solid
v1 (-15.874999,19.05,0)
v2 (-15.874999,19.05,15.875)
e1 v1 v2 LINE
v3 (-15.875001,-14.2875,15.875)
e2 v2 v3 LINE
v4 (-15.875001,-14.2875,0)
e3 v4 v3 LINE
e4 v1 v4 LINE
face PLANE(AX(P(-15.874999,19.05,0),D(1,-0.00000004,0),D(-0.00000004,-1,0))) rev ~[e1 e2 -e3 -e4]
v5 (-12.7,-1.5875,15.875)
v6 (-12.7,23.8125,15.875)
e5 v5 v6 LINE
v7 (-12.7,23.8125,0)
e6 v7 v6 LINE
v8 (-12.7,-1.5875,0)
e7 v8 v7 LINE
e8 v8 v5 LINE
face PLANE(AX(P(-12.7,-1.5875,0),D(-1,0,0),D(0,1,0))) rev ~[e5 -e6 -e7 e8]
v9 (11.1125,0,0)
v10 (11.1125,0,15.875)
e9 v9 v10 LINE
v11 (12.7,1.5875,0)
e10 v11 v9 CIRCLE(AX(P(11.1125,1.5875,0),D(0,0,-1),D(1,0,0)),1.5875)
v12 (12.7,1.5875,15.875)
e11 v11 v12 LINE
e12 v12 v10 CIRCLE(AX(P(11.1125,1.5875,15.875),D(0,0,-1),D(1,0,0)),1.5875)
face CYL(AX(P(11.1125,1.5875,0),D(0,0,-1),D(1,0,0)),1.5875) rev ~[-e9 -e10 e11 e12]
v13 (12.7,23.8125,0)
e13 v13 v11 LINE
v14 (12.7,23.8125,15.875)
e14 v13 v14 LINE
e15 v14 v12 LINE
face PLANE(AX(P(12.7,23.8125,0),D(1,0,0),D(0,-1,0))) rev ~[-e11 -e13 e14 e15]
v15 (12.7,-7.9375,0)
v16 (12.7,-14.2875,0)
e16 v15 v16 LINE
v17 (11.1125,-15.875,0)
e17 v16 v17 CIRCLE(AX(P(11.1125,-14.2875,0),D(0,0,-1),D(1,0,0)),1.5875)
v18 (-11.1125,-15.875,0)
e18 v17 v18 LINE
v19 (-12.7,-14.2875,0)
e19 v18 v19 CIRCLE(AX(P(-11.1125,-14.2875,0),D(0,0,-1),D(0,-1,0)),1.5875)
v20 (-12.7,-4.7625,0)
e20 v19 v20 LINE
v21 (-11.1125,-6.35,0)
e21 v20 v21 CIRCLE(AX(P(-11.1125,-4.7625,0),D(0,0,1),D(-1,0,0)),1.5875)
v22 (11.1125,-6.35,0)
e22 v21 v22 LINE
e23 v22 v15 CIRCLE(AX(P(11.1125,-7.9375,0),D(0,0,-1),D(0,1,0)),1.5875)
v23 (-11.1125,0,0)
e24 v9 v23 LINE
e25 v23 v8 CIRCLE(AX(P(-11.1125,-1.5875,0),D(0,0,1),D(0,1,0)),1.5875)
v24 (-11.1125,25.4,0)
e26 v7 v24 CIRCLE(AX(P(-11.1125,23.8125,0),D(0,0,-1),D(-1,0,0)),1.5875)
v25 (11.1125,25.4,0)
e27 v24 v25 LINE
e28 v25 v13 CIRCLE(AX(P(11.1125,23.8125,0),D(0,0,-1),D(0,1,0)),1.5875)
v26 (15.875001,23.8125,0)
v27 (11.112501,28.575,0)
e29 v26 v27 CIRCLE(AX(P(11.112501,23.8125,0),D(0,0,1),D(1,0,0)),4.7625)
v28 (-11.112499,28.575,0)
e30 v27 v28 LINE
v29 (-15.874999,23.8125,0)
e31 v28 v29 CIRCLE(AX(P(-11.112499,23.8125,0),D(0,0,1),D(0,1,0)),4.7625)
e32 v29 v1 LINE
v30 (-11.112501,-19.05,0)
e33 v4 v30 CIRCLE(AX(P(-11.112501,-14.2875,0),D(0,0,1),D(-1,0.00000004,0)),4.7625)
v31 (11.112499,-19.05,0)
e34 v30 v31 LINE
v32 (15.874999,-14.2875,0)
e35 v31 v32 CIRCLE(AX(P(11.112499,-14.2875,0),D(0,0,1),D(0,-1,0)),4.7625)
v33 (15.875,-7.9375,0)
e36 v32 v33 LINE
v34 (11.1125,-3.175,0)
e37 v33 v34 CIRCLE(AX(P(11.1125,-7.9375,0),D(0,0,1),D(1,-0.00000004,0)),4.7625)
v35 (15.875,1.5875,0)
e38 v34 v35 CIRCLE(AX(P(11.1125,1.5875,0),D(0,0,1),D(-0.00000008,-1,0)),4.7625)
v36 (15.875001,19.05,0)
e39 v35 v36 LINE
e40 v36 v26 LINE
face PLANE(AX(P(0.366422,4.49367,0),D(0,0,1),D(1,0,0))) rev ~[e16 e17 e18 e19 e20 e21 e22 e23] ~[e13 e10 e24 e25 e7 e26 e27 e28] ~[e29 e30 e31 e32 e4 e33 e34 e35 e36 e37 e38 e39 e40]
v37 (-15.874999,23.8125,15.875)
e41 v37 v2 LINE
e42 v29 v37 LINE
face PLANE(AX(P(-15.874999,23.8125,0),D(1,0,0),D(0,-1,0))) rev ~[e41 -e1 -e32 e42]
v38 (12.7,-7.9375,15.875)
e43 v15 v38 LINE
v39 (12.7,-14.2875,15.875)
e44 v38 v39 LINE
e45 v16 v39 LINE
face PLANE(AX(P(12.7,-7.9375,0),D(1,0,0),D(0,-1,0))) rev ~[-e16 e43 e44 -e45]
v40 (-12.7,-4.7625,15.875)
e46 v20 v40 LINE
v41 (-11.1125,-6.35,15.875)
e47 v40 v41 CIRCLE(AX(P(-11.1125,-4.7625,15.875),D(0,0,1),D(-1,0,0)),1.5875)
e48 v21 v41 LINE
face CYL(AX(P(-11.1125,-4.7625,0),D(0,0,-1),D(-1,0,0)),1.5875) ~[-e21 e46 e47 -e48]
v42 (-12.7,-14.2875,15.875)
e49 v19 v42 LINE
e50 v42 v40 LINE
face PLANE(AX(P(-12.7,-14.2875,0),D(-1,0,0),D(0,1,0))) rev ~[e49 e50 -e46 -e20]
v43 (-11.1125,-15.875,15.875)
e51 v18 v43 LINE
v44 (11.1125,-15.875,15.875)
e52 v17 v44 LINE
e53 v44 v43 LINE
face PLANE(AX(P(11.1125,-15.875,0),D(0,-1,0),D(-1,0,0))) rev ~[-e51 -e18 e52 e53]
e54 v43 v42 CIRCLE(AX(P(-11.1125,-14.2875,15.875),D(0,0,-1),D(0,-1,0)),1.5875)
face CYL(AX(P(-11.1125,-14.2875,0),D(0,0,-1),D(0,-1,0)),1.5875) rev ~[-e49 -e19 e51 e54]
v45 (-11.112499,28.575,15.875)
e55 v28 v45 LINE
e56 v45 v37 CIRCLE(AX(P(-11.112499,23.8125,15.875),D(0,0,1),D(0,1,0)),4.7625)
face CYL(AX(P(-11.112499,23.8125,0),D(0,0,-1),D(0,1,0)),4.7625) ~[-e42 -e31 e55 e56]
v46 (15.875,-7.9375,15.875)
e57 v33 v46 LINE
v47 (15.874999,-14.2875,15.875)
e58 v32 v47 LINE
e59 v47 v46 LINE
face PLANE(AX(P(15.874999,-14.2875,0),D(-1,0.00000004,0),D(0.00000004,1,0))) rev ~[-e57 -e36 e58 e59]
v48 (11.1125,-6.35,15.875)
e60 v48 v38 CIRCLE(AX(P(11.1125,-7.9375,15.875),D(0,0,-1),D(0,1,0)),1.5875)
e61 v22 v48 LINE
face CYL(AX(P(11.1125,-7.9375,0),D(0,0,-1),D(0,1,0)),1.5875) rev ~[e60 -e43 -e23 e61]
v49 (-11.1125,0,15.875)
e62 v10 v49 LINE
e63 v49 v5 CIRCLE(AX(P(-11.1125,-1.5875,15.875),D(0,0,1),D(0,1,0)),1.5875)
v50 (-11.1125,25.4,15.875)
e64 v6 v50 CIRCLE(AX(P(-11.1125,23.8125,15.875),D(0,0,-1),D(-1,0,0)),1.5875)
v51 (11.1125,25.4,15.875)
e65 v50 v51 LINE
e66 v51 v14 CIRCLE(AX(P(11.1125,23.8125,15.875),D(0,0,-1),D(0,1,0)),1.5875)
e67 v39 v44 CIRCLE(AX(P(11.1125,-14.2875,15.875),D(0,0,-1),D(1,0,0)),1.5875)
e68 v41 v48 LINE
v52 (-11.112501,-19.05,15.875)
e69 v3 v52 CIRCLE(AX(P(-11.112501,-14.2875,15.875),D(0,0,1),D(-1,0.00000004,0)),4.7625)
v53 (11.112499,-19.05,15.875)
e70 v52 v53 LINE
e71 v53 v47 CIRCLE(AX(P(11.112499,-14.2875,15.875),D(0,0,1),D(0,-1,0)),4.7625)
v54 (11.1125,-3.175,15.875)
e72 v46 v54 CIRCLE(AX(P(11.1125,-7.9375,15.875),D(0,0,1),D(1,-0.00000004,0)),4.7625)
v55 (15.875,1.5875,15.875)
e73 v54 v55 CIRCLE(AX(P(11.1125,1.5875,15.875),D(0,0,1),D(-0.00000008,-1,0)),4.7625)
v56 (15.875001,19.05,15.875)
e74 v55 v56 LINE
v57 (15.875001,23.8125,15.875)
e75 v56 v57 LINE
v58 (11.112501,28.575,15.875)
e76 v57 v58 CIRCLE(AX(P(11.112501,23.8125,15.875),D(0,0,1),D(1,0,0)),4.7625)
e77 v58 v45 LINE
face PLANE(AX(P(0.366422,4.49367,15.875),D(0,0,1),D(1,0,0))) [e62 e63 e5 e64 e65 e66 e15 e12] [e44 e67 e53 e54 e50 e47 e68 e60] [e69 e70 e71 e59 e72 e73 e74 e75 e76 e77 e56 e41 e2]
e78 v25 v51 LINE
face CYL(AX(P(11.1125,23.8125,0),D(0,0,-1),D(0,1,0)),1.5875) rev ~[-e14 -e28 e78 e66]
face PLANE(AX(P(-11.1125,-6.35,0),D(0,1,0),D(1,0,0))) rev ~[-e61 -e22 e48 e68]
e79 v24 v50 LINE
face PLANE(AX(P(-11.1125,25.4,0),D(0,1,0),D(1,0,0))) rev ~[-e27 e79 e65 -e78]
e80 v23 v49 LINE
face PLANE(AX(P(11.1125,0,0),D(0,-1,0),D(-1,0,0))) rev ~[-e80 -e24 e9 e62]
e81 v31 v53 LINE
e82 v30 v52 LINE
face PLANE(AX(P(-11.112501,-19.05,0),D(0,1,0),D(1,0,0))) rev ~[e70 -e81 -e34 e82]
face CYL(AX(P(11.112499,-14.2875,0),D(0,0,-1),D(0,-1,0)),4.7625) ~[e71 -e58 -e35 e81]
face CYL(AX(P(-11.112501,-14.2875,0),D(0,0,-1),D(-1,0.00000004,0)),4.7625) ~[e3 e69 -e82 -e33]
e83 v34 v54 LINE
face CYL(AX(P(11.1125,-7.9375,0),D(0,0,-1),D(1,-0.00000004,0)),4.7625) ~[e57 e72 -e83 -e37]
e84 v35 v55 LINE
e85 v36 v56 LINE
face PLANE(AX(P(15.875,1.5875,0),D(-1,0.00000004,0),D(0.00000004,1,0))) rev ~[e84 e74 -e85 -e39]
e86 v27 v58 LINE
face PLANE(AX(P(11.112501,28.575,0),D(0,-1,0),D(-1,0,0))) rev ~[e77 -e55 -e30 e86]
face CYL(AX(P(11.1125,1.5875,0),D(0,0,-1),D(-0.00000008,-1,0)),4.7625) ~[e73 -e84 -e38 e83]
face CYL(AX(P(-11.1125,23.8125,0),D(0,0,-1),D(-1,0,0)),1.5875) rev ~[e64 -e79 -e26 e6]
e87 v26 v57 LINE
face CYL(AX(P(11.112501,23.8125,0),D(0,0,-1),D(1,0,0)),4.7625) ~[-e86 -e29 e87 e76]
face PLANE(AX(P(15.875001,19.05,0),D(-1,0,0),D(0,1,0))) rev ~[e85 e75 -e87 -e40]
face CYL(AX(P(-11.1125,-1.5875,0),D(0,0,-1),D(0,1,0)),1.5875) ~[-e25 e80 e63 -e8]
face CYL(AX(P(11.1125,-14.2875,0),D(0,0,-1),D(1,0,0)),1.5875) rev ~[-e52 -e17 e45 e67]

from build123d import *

# Parameters (mm, degrees)
F1_DEPTH = 15.875


# Not quite as in the source:
# - ends of sketch curves that miss each other by under 0.0002 mm in the source are joined
# - the program builds the solid bodies; features that only make, move or delete a surface that nothing else refers to are left out


with BuildPart() as f1:
    # F0 (on Top) → F1 (new body)
    with BuildSketch(Plane.XY):
        with BuildLine():
            Line((-11.1125005688, -19.05), (11.1124994312, -19.05))
            ThreePointArc((11.1124994312, -19.05), (14.4800954095, -17.6550961124), (15.8749994312, -14.2875001896))
            Line((15.8749994312, -14.2875001896), (15.874999684, -7.9375001896))
            ThreePointArc((15.874999684, -7.9375001896), (14.4800957964, -4.5699040216), (11.112499684, -3.175))
            ThreePointArc((11.112499684, -3.175), (14.4800960416, -1.7800961124), (15.8750000632, 1.5874998104))
            Line((15.8750000632, 1.5874998104), (15.8750007584, 19.05))
            Line((15.8750007584, 19.05), (15.8750007584, 23.8125))
            ThreePointArc((15.8750007584, 23.8125), (14.4800968038, 27.1800960454), (11.1125007584, 28.575))
            Line((11.1125007584, 28.575), (-11.1124992416, 28.575))
            ThreePointArc((-11.1124992416, 28.575), (-14.480095287, 27.1800960454), (-15.8749992416, 23.8125))
            Line((-15.8749992416, 23.8125), (-15.8749992416, 19.05))
            Line((-15.8749992416, 19.05), (-15.8750005688, -14.2874998104))
            ThreePointArc((-15.8750005688, -14.2874998104), (-14.4800966813, -17.6550959784), (-11.1125005688, -19.05))
        make_face()
        with BuildLine():
            Line((-12.7, -6.35), (-12.7, -4.7625))
            ThreePointArc((-12.7, -4.7625), (-12.2350320151, -5.8850320151), (-11.1125, -6.35))
            Line((-11.1125, -6.35), (11.1125, -6.35))
            ThreePointArc((11.1125, -6.35), (12.2350320151, -6.8149679849), (12.7, -7.9375))
            Line((12.7, -7.9375), (12.7, -14.2875))
            ThreePointArc((12.7, -14.2875), (12.2350320151, -15.4100320151), (11.1125, -15.875))
            Line((11.1125, -15.875), (-11.1125, -15.875))
            ThreePointArc((-11.1125, -15.875), (-12.2350320151, -15.4100320151), (-12.7, -14.2875))
            Line((-12.7, -14.2875), (-12.7, -6.35))
        make_face(mode=Mode.SUBTRACT)
        with BuildLine():
            ThreePointArc((-12.7, -1.5875), (-12.2350320151, -2.7100320151), (-11.1125, -3.175))
            ThreePointArc((-11.1125, -3.175), (-12.2350320151, -3.6399679849), (-12.7, -4.7625))
            Line((-12.7, -4.7625), (-12.7, -3.175))
            Line((-12.7, -3.175), (-12.7, -1.5875))
        make_face(mode=Mode.SUBTRACT)
        with BuildLine():
            ThreePointArc((-11.1125, 0), (-12.2350320151, -0.4649679849), (-12.7, -1.5875))
            Line((-12.7, -1.5875), (-12.7, 0))
            Line((-12.7, 0), (-12.7, 23.8125))
            ThreePointArc((-12.7, 23.8125), (-12.2350320151, 24.9350320151), (-11.1125, 25.4))
            Line((-11.1125, 25.4), (11.1125, 25.4))
            ThreePointArc((11.1125, 25.4), (12.2350320151, 24.9350320151), (12.7, 23.8125))
            Line((12.7, 23.8125), (12.7, 1.5875))
            ThreePointArc((12.7, 1.5875), (12.2350320151, 0.4649679849), (11.1125, 0))
            Line((11.1125, 0), (-11.1125, 0))
        make_face(mode=Mode.SUBTRACT)
        with BuildLine():
            Line((-12.7, -3.175), (-11.1125, -3.175))
            ThreePointArc((-11.1125, -3.175), (-12.2350320151, -2.7100320151), (-12.7, -1.5875))
            Line((-12.7, -1.5875), (-12.7, -3.175))
        make_face()
        with BuildLine():
            ThreePointArc((-12.7, -4.7625), (-12.2350320151, -3.6399679849), (-11.1125, -3.175))
            Line((-11.1125, -3.175), (-12.7, -3.175))
            Line((-12.7, -3.175), (-12.7, -4.7625))
        make_face()
    extrude(amount=F1_DEPTH)


solid = f1.part
